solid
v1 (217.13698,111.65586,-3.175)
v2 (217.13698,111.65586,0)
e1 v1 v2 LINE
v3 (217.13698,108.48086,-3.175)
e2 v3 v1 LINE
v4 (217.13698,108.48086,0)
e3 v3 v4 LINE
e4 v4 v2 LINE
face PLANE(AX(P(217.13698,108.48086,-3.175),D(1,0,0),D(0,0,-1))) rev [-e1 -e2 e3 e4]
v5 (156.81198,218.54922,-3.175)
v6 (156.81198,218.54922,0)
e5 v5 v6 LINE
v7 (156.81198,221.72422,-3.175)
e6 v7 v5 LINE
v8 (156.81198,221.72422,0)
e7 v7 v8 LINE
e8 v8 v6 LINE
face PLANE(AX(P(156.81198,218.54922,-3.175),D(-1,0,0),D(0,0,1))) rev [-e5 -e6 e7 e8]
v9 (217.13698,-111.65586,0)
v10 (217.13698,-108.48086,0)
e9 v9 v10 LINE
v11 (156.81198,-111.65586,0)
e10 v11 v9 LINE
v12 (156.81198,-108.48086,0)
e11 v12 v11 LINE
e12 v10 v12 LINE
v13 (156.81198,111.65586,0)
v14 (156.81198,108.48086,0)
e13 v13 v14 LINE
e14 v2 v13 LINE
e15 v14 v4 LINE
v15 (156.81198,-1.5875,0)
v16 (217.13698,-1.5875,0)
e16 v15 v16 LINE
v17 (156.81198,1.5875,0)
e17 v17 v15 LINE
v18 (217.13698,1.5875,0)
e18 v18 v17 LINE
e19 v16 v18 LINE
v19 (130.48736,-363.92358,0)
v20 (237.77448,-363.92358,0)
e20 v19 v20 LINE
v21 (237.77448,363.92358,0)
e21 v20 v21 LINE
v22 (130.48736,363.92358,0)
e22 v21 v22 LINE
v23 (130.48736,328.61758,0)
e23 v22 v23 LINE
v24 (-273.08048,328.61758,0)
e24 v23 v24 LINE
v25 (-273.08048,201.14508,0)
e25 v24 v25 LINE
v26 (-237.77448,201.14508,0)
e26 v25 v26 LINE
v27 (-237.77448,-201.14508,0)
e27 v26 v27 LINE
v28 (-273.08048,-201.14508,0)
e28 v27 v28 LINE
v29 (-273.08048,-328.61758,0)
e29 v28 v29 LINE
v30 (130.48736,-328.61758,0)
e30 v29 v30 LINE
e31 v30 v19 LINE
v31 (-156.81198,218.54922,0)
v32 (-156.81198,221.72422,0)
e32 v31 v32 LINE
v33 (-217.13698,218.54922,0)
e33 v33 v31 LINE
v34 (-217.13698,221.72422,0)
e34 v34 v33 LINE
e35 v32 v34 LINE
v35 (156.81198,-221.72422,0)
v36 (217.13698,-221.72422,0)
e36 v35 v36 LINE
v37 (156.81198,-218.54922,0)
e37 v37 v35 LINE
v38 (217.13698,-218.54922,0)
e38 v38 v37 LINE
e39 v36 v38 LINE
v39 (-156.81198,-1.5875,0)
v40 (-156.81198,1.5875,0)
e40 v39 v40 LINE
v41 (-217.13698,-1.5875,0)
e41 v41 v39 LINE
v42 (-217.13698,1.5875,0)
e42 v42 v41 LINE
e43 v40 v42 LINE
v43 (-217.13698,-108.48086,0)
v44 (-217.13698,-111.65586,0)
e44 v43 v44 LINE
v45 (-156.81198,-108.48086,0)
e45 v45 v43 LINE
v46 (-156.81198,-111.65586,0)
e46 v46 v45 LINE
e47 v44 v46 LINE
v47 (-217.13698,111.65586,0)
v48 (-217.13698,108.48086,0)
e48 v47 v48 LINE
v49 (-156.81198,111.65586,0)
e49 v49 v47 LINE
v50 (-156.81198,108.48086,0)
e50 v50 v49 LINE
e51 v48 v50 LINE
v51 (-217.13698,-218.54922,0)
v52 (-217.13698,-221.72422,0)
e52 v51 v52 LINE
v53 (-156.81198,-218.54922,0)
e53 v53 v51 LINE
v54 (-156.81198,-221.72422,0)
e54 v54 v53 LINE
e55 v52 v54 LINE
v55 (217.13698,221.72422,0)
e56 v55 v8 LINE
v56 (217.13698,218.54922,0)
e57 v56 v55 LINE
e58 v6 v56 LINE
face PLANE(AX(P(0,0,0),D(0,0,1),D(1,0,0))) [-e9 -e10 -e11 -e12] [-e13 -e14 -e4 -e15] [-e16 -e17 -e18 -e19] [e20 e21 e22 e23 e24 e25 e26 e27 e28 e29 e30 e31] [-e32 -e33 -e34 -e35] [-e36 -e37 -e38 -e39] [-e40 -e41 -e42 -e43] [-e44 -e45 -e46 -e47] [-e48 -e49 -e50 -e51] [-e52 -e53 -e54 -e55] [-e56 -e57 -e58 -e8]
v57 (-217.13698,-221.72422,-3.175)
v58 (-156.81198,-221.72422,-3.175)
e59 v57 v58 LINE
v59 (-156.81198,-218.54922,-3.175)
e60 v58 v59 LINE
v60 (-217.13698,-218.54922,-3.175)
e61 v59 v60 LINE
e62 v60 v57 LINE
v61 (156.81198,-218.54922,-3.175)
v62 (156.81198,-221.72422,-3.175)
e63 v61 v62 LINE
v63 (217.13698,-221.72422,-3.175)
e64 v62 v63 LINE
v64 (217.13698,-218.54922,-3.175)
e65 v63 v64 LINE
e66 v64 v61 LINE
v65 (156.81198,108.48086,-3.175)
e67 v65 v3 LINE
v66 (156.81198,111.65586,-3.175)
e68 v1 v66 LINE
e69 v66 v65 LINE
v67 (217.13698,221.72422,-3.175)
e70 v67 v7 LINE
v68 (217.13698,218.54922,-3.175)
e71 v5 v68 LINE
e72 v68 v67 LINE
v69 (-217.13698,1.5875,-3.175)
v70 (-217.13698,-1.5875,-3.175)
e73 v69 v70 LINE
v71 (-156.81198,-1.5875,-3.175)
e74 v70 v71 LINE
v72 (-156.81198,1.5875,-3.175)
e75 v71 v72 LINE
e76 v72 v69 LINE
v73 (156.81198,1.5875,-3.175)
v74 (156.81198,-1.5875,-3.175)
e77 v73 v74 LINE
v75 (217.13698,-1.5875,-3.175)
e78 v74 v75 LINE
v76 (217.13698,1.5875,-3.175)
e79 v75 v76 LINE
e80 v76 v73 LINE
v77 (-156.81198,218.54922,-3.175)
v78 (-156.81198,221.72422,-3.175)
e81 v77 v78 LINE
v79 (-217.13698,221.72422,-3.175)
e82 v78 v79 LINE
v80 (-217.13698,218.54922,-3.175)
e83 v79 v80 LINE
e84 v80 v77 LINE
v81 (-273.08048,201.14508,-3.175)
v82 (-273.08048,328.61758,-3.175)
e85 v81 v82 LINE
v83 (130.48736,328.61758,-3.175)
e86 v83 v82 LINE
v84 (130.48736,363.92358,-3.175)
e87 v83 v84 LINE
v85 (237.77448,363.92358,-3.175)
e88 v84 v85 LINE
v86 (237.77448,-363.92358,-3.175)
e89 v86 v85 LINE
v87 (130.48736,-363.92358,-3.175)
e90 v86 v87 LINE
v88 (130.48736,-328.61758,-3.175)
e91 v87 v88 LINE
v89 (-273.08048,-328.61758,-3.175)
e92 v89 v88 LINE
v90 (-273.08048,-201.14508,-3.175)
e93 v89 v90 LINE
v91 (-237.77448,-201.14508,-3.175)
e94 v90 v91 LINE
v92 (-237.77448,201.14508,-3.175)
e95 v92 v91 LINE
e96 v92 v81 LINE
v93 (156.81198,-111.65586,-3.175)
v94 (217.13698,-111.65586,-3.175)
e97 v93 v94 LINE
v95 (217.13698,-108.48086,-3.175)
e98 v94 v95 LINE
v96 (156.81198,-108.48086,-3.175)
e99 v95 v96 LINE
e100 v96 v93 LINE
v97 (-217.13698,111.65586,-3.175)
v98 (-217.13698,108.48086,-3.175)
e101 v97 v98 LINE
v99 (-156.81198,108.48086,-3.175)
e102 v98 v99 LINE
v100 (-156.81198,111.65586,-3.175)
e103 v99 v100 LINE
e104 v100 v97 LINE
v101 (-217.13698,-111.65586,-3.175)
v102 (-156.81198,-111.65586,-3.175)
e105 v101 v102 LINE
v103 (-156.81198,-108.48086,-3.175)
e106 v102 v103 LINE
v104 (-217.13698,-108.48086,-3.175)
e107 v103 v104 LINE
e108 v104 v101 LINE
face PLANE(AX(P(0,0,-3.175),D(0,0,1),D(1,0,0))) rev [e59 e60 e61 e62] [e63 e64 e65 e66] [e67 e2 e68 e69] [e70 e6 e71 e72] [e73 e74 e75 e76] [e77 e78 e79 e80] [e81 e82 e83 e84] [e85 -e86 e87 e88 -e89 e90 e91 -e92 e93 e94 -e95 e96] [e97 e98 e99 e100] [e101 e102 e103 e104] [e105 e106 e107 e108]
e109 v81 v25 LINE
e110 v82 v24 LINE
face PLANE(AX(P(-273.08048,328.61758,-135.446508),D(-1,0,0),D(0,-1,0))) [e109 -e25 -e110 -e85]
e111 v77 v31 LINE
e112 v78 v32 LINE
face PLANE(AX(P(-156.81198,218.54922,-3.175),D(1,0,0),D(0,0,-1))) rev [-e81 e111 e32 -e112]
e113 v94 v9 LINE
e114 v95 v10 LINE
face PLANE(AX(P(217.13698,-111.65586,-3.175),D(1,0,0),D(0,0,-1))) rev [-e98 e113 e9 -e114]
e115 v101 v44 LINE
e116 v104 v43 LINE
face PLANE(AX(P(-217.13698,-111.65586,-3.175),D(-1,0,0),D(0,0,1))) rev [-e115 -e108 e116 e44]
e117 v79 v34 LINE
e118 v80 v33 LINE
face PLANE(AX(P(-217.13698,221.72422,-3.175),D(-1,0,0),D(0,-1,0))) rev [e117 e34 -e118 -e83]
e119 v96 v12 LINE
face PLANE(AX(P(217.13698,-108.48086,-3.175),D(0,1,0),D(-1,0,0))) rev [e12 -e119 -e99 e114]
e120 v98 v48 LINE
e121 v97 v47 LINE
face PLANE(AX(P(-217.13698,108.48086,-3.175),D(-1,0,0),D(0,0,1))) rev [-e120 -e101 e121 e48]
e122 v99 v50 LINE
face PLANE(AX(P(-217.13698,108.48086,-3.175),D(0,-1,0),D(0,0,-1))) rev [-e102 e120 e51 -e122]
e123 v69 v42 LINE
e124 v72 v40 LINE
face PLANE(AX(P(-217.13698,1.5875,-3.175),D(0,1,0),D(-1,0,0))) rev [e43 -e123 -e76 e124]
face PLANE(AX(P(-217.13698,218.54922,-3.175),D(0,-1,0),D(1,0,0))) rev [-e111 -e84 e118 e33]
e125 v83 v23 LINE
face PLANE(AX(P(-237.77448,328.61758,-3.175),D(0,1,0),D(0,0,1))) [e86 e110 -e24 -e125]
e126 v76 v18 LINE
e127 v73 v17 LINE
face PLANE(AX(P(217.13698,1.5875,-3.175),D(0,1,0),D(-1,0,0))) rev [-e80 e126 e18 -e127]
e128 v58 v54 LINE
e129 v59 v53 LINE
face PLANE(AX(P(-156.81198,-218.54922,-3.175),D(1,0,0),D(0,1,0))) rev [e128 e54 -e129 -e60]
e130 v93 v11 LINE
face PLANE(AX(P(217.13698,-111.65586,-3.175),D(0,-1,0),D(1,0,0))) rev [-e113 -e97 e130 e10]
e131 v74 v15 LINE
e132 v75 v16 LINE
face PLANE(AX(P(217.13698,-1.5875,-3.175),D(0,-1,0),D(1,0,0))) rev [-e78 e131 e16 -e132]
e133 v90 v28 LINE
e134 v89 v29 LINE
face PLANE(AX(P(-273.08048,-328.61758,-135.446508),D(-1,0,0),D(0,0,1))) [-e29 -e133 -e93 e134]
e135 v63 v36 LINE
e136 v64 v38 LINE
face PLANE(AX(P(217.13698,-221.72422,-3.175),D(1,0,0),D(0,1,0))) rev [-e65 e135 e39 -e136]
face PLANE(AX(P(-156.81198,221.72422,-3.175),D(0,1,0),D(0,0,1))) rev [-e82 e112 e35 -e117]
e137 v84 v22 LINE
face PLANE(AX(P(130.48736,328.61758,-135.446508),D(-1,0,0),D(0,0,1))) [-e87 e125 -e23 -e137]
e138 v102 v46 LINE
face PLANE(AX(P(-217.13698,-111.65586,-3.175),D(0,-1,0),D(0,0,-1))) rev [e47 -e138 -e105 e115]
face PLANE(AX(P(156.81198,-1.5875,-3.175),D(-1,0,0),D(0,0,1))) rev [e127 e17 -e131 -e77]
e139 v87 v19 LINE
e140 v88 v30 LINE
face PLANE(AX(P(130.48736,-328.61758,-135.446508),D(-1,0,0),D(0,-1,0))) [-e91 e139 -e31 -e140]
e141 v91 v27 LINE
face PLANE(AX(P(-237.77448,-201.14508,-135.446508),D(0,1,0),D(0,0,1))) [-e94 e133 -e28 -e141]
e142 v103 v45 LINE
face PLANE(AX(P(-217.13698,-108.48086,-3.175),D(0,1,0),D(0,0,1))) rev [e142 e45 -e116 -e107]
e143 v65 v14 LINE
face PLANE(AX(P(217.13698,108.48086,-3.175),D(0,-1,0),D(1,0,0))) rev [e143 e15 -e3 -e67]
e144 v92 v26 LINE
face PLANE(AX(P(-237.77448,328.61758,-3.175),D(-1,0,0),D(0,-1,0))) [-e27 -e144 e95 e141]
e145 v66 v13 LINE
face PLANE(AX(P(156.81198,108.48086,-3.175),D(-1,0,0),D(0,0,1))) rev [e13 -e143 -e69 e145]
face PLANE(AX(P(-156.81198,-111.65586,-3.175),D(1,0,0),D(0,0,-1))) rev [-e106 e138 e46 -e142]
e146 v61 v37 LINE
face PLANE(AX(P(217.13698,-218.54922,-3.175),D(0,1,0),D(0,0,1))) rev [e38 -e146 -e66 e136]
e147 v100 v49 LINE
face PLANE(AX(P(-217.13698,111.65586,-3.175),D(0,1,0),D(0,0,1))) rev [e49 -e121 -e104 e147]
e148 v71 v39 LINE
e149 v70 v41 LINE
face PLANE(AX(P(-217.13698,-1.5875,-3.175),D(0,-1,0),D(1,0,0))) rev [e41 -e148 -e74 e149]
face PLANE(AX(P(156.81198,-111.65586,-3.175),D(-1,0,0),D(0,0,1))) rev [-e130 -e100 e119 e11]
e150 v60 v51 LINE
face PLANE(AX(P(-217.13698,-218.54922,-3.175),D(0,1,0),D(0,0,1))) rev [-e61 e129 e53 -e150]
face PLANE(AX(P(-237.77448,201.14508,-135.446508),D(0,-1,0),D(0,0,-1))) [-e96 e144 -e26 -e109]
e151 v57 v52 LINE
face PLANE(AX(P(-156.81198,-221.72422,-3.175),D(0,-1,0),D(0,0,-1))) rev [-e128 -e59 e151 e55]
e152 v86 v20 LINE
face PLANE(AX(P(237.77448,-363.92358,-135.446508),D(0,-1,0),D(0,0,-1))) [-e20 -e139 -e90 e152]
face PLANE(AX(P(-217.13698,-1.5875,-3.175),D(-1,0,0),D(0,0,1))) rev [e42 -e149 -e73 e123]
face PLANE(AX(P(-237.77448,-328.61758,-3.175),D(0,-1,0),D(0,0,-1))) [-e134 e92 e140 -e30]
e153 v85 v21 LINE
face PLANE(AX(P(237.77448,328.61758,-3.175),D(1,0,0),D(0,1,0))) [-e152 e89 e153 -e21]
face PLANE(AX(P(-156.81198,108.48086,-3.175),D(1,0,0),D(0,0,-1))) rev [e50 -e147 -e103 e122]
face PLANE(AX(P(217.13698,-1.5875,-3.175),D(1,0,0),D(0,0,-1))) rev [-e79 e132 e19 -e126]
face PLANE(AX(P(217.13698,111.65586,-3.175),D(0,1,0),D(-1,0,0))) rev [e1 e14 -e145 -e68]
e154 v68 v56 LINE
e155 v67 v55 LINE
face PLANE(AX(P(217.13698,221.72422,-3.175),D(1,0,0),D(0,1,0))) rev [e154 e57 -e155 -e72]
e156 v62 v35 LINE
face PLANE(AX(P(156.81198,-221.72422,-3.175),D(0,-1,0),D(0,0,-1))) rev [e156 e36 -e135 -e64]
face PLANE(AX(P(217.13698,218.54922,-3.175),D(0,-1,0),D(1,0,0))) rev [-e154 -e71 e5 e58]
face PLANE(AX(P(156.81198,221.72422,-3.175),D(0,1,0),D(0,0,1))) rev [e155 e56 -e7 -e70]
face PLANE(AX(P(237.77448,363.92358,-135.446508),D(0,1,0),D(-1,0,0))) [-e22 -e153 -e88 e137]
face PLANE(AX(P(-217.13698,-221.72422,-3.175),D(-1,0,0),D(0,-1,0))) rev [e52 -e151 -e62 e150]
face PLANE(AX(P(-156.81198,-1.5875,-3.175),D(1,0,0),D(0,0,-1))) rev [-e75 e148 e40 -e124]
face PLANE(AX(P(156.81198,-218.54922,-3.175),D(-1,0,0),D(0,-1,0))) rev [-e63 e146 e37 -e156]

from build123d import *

# Parameters (mm, degrees)
SKETCH1_W               = 475.54896
SKETCH1_H               = 657.23516
BASE_FLANGE1_DEPTH      = 3.175
CUT_EXTRUDE1_DEPTH      = 406.63074076
CUT_EXTRUDE1_DEPTH_BACK = 406.63074076
SKETCH2_W               = 60.325
SKETCH2_H               = 3.175
SKETCH3_W               = 107.287119944
SKETCH3_H               = 35.306
SKETCH3_W_2             = 35.306
SKETCH3_H_2             = 127.472499944
BOSS_EXTRUDE1_DEPTH     = 3.175


# Sheet-metal steps are written as plain solids
with BuildPart() as part:
    # Sketch1 → Base-Flange1 (new body)
    with BuildSketch(Plane.XY):
        Rectangle(SKETCH1_W, SKETCH1_H)
    extrude(amount=-BASE_FLANGE1_DEPTH)

    # Sketch2 → Cut-Extrude1 (cut, two sides: drawn at the far end of the back side and taken through both)
    with BuildSketch(Plane.XY.offset(-CUT_EXTRUDE1_DEPTH_BACK)):
        with Locations((-186.97448, 220.13672)):
            Rectangle(SKETCH2_W, SKETCH2_H)
        with Locations((186.97448, -220.13672)):
            Rectangle(SKETCH2_W, SKETCH2_H)
        with Locations((186.97448, 220.13672)):
            Rectangle(SKETCH2_W, SKETCH2_H)
        with Locations((-186.97448, -220.13672)):
            Rectangle(SKETCH2_W, SKETCH2_H)
        with Locations((-186.97448, 0)):
            Rectangle(SKETCH2_W, SKETCH2_H)
        with Locations((186.97448, -110.06836)):
            Rectangle(SKETCH2_W, SKETCH2_H)
        with Locations((-186.97448, -110.06836)):
            Rectangle(SKETCH2_W, SKETCH2_H)
        with Locations((-186.97448, 110.06836)):
            Rectangle(SKETCH2_W, SKETCH2_H)
        with Locations((186.97448, 0)):
            Rectangle(SKETCH2_W, SKETCH2_H)
        with Locations((186.97448, 110.06836)):
            Rectangle(SKETCH2_W, SKETCH2_H)
    extrude(amount=CUT_EXTRUDE1_DEPTH + CUT_EXTRUDE1_DEPTH_BACK, mode=Mode.SUBTRACT)

    # Sketch3 → Boss-Extrude1 (add)
    with BuildSketch(Plane.XY):
        with Locations((184.130920028, 346.27058)):
            Rectangle(SKETCH3_W, SKETCH3_H)
        with Locations((-255.42748, 264.881330028)):
            Rectangle(SKETCH3_W_2, SKETCH3_H_2)
        with Locations((-255.42748, -264.881330028)):
            Rectangle(SKETCH3_W_2, SKETCH3_H_2)
        with Locations((184.130920028, -346.27058)):
            Rectangle(SKETCH3_W, SKETCH3_H)
    extrude(amount=-BOSS_EXTRUDE1_DEPTH)


solid = part.part
